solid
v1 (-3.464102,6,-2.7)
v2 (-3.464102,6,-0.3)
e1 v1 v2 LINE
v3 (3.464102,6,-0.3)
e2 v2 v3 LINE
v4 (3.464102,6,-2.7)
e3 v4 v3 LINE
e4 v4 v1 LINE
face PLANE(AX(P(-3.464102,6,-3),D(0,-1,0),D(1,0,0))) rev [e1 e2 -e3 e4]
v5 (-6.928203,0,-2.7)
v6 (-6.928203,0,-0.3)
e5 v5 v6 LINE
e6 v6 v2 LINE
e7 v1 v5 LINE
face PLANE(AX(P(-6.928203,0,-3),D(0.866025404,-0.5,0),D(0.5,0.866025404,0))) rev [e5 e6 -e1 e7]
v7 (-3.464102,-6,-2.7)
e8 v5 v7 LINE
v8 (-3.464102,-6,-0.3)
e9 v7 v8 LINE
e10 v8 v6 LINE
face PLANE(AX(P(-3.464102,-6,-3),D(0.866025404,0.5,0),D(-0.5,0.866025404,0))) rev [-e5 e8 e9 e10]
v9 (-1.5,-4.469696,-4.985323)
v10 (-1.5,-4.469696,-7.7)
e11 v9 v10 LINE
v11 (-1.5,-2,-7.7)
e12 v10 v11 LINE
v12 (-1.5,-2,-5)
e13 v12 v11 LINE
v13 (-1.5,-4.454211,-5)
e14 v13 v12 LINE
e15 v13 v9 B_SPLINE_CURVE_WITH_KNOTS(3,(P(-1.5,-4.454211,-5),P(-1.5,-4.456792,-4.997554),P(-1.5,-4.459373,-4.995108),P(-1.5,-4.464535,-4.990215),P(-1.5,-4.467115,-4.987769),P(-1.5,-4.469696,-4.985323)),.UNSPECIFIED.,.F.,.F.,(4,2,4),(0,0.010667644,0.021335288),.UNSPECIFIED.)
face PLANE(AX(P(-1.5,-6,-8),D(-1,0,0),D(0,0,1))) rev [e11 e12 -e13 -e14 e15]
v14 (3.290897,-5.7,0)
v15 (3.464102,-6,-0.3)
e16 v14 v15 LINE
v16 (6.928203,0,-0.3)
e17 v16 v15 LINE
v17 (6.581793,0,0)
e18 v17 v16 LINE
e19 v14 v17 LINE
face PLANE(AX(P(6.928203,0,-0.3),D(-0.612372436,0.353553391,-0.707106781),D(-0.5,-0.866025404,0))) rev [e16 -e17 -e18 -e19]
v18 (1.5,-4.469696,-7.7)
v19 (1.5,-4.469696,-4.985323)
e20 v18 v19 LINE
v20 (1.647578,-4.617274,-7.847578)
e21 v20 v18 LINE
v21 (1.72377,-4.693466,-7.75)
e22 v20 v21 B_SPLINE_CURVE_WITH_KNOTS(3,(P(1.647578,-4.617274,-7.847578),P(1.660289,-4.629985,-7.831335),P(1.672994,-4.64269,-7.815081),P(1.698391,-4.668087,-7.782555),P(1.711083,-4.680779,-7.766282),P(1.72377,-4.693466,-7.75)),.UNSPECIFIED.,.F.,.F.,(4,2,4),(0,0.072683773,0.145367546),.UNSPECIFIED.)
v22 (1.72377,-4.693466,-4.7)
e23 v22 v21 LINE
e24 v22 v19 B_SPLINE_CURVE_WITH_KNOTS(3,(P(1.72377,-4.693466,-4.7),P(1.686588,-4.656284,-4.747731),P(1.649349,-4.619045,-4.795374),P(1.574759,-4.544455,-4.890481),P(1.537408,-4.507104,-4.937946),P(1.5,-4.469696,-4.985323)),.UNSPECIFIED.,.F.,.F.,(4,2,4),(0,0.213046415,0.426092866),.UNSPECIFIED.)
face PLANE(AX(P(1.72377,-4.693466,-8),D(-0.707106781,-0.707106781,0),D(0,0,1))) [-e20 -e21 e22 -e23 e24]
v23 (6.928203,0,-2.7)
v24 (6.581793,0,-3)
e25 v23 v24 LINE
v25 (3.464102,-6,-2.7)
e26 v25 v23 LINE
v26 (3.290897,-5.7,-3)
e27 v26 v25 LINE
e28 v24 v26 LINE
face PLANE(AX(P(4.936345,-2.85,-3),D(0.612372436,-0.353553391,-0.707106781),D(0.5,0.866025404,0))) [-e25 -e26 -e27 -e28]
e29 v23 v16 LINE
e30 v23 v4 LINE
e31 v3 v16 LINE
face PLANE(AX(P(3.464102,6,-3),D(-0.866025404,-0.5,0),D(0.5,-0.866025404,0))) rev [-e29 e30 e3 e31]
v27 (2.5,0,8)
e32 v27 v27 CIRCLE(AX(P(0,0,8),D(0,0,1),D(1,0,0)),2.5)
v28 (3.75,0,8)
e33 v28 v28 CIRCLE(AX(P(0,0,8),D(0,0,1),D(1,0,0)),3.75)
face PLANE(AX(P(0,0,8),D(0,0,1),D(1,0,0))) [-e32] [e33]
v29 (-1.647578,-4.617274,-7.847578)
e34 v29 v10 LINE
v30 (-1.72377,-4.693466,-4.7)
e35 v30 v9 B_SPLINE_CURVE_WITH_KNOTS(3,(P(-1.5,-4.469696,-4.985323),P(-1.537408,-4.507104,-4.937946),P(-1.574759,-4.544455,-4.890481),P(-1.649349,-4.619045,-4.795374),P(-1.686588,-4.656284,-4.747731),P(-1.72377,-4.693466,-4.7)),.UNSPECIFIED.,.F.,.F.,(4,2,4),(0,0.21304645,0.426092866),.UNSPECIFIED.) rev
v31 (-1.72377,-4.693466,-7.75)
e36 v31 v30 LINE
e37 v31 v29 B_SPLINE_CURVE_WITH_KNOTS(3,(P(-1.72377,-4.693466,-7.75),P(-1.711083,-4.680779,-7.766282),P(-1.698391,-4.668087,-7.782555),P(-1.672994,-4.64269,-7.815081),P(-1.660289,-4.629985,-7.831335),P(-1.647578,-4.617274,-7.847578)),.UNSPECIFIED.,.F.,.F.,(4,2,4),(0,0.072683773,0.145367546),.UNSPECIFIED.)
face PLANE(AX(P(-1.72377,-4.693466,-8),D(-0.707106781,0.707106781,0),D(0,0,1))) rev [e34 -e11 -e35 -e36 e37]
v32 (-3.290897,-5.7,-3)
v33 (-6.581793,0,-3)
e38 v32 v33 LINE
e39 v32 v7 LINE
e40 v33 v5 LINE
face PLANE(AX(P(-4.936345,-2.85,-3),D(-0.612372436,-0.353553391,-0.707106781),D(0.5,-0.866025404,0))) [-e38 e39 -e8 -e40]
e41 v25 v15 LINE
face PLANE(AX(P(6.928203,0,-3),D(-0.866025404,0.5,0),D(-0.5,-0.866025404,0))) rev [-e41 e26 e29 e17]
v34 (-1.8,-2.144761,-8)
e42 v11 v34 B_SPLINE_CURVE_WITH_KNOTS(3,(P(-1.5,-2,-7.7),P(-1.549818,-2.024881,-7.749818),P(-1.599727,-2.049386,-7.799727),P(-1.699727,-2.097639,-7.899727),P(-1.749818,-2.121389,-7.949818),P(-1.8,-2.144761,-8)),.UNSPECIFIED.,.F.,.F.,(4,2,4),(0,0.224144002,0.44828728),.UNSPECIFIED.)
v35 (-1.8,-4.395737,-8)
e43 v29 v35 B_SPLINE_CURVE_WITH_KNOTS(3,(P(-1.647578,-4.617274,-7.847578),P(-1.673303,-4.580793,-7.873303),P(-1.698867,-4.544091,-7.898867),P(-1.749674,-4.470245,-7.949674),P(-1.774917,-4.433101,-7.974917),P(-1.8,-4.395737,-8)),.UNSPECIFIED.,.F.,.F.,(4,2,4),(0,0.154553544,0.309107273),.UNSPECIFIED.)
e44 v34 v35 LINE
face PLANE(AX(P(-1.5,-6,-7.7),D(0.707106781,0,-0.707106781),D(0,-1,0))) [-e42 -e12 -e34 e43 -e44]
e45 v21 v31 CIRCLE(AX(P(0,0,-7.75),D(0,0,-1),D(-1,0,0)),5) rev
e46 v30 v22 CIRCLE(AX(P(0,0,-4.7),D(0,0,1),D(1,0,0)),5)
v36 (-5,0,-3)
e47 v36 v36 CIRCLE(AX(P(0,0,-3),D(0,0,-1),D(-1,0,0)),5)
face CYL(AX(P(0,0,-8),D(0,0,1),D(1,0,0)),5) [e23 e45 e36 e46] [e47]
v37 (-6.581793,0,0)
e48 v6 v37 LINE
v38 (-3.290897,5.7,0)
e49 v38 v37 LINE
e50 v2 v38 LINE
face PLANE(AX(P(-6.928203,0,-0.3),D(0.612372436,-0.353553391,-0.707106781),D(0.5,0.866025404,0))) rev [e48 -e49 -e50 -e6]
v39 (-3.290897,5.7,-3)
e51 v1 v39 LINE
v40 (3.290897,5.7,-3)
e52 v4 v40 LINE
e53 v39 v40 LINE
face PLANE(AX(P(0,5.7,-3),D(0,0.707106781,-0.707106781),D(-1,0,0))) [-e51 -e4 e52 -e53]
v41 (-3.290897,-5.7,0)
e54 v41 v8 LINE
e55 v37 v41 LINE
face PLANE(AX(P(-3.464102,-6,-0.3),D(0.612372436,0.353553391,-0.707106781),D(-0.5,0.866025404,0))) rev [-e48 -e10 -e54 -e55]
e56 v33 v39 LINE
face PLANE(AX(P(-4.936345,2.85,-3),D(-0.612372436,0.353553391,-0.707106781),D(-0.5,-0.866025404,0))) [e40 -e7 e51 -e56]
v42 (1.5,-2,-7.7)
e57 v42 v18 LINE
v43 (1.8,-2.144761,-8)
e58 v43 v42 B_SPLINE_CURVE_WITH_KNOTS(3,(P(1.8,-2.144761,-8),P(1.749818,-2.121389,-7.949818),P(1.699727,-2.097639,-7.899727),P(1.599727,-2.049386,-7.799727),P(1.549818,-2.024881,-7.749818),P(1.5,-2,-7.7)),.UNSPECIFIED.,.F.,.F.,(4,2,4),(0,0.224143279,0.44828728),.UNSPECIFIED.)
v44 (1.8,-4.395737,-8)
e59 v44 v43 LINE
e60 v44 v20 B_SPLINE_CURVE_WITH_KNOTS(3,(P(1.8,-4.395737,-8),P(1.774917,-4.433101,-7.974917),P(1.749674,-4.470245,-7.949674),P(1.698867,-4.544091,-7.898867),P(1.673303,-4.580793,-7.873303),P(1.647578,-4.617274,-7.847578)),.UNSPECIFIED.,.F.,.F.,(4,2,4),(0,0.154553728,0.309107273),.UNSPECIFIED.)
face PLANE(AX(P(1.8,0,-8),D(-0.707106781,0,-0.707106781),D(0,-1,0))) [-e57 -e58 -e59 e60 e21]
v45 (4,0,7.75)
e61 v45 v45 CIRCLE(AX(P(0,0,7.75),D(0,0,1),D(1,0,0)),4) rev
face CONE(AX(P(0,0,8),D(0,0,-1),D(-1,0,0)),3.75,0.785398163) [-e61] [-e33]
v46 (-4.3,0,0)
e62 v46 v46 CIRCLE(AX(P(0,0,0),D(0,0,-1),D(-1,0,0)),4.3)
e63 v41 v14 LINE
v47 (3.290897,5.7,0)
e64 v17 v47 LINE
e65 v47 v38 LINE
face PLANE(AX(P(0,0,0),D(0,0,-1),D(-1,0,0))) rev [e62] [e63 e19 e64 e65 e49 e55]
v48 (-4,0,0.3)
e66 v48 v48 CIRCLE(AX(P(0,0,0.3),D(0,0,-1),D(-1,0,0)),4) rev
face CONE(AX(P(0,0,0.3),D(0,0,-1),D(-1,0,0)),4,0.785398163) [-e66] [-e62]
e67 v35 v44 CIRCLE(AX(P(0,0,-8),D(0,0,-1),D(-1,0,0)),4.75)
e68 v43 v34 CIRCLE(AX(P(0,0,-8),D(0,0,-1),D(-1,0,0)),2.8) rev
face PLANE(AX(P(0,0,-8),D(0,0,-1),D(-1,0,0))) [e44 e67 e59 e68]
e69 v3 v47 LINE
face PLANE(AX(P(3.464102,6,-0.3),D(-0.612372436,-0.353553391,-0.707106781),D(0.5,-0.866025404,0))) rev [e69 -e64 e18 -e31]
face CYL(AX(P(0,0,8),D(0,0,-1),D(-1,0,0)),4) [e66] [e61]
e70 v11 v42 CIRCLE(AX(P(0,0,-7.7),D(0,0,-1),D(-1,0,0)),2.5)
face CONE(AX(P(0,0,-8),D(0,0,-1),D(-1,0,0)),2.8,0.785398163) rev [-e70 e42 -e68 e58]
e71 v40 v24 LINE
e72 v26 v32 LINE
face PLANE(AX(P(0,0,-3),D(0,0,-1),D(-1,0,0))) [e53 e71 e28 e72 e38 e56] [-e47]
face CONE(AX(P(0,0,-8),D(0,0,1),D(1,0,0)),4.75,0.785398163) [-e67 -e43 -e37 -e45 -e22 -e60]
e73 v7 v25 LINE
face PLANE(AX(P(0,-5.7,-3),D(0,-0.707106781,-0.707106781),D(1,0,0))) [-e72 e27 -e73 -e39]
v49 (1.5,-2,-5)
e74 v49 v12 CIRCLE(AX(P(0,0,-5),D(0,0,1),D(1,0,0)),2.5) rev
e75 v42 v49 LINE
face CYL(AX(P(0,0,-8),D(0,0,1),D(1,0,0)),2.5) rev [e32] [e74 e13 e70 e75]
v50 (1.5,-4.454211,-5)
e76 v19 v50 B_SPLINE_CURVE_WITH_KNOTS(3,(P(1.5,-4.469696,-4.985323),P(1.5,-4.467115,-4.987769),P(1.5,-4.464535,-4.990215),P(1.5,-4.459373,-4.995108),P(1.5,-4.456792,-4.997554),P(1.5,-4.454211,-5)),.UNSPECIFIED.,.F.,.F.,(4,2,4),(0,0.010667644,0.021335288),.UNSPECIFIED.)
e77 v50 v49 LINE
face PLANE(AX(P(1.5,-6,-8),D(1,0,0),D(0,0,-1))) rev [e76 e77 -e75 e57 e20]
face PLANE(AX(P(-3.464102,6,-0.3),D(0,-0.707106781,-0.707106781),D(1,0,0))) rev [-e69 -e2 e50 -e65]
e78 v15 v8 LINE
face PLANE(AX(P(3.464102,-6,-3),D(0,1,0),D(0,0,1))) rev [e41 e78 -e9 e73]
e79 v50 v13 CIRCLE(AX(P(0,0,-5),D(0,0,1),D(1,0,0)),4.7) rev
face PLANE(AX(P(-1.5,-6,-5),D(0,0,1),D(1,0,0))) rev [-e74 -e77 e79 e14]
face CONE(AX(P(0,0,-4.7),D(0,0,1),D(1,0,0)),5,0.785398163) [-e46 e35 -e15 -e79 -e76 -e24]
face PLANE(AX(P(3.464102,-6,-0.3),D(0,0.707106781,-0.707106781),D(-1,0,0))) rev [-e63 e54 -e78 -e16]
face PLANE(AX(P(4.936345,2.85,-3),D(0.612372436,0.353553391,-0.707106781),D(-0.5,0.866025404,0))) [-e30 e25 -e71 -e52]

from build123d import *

# Parameters (mm, degrees)
SKETCH1_R           = 4
BOSS_EXTRUDE1_DEPTH = 8
BOSS_EXTRUDE2_DEPTH = 3
SKETCH3_R           = 5
BOSS_EXTRUDE3_DEPTH = 5
SKETCH4_R           = 2.5
CUT_EXTRUDE1_DEPTH  = 19.439088915
CHAMFER1_SIZE       = 0.3
CHAMFER2_SIZE       = 0.3
SKETCH5_W           = 3
SKETCH5_H           = 3
CUT_EXTRUDE2_DEPTH  = 13.165525061
CHAMFER3_SIZE       = 0.3
CHAMFER4_SIZE       = 0.3
CHAMFER5_SIZE       = 0.25


with BuildPart() as part:
    # Sketch1 → Boss-Extrude1 (new body)
    with BuildSketch(Plane.XY):
        Circle(SKETCH1_R)
    extrude(amount=BOSS_EXTRUDE1_DEPTH)

    # Sketch2 → Boss-Extrude2 (add)
    with BuildSketch(Plane(origin=(0, 0, 0), x_dir=(-1, 0, 0), z_dir=(0, 0, -1))):
        Polygon((-3.464101615, 6), (-6.92820323, 0), (-3.464101615, -6), (3.464101615, -6), (6.92820323, 0), (3.464101615, 6), align=None)
    extrude(amount=BOSS_EXTRUDE2_DEPTH)

    # Sketch3 → Boss-Extrude3 (add)
    with BuildSketch(Plane(origin=(0, 0, -3), x_dir=(-1, 0, 0), z_dir=(0, 0, -1))):
        Circle(SKETCH3_R)
    extrude(amount=BOSS_EXTRUDE3_DEPTH)

    # Sketch4 → Cut-Extrude1 (cut, through all)
    with BuildSketch(Plane.XY.offset(8)):
        Circle(SKETCH4_R)
    extrude(amount=-CUT_EXTRUDE1_DEPTH, mode=Mode.SUBTRACT)

    # Chamfer1
    chamfer1_edges = [part.edges().sort_by_distance(p)[0] for p in [
        (-4, 0, 0),
    ]]
    chamfer(chamfer1_edges, length=CHAMFER1_SIZE)

    # Chamfer2
    chamfer2_edges = [part.edges().sort_by_distance(p)[0] for p in [
        (-2.5, 0, -8),
    ]]
    chamfer(chamfer2_edges, length=CHAMFER2_SIZE)

    # Sketch5 → Cut-Extrude2 (cut, through all)
    with BuildSketch(Plane(origin=(0, 0, 0), x_dir=(1, 0, 0), z_dir=(0, 1, 0))):
        with Locations((0, 6.5)):
            Rectangle(SKETCH5_W, SKETCH5_H)
    extrude(amount=-CUT_EXTRUDE2_DEPTH, mode=Mode.SUBTRACT)

    # Chamfer3
    chamfer3_edges = [part.edges().sort_by_distance(p)[0] for p in [
        (-5.196152423, 3, -3),
        (0, 6, 0),
        (5.196152423, 3, 0),
        (5.196152423, -3, 0),
        (0, -6, 0),
        (-5.196152423, -3, 0),
        (-5.196152423, 3, 0),
        (0, 6, -3),
        (5.196152423, 3, -3),
        (5.196152423, -3, -3),
        (0, -6, -3),
        (-5.196152423, -3, -3),
    ]]
    chamfer(chamfer3_edges, length=CHAMFER3_SIZE)

    # Chamfer4
    # the kernel refuses this chamfer: 0.3, 0.239246049 mm, written as the material it takes off along each edge
    with BuildSketch(Plane(origin=(1.5, -1.592813187, -8), x_dir=(0, 0, 1), z_dir=(0, -1, 0))) as chamfer4_piece_1:
        Polygon((CHAMFER4_SIZE, 0), (0, -CHAMFER4_SIZE), (0, 0), align=None)
    extrude(amount=3.948387716, mode=Mode.SUBTRACT)
    with BuildSketch(Plane(origin=(-1.5, -1.592813187, -8), x_dir=(0, 0, 1), z_dir=(0, -1, 0))) as chamfer4_piece_2:
        Polygon((CHAMFER4_SIZE, 0), (0, CHAMFER4_SIZE), (0, 0), align=None)
    extrude(amount=3.948387716, mode=Mode.SUBTRACT)
    with BuildSketch(Plane(origin=(0, 0, -5), x_dir=(-0.44305448610570786, -0.8964946861758898, 0), z_dir=(-0.8964946861758898, 0.44305448610570786, 0))) as chamfer4_piece_3_section:
        Polygon((5, CHAMFER4_SIZE), (5 - CHAMFER4_SIZE, 0), (5, 0), align=None)
    chamfer4_piece_3 = revolve(axis=Axis((0, 0, -5), (0, 0, 1)), revolution_arc=52.597864763, mode=Mode.PRIVATE)
    chamfer4_piece_3 = split(chamfer4_piece_3, bisect_by=Plane(origin=(1.5, 0, -5), z_dir=(-1, 0, 0)), keep=Keep.TOP, mode=Mode.PRIVATE)
    chamfer4_piece_3 = split(chamfer4_piece_3, bisect_by=Plane(origin=(-1.5, 0, -5), z_dir=(1, 0, 0)), keep=Keep.TOP, mode=Mode.PRIVATE)
    add(chamfer4_piece_3, mode=Mode.SUBTRACT)
    with BuildSketch(Plane(origin=(-1.5, -4.769696007, -8.771504896), x_dir=(-0.946580683310887, 0.32246706805919617, 0), z_dir=(0, 0, 1))) as chamfer4_piece_4:
        with BuildLine():
            Line((0.236397724, 0), (CHAMFER4_SIZE * 0.322467068059, -CHAMFER4_SIZE * 0.946580683311))
            Line((CHAMFER4_SIZE * 0.322467068059, -CHAMFER4_SIZE * 0.946580683311), (0, 0))
            ThreePointArc((0, 0), (0.120844642, 0.001396592), (0.236397724, 0))
        make_face()
    extrude(amount=3.771504896, mode=Mode.SUBTRACT)
    with BuildSketch(Plane(origin=(1.5, -4.769696007, -8.771504896), x_dir=(0.9465806833108867, 0.32246706805919695, 0), z_dir=(0, 0, 1))) as chamfer4_piece_5:
        with BuildLine():
            Line((0.236397724, 0), (CHAMFER4_SIZE * 0.322467068059, CHAMFER4_SIZE * 0.946580683311))
            Line((CHAMFER4_SIZE * 0.322467068059, CHAMFER4_SIZE * 0.946580683311), (0, 0))
            ThreePointArc((0, 0), (0.120844642, -0.001396592), (0.236397724, 0))
        make_face()
    extrude(amount=3.771504896, mode=Mode.SUBTRACT)
    with BuildSketch(Plane(origin=(-1.5, -4.769696007, -8.771504896), x_dir=(-0.946580683310887, 0.32246706805919617, 0), z_dir=(0, 0, 1))) as chamfer4_piece_6a_section:
        with BuildLine():
            Line((0.236397724, 0), (CHAMFER4_SIZE * 0.322467068059, -CHAMFER4_SIZE * 0.946580683311))
            Line((CHAMFER4_SIZE * 0.322467068059, -CHAMFER4_SIZE * 0.946580683311), (0, 0))
            ThreePointArc((0, 0), (0.120844642, 0.001396592), (0.236397724, 0))
        make_face()
    chamfer4_piece_6a = extrude(amount=4.543009793, mode=Mode.PRIVATE)
    chamfer4_piece_6a = split(chamfer4_piece_6a, bisect_by=Plane(origin=(-1.5, -4.769696007, -5), z_dir=(0, 0, 1)), keep=Keep.TOP, mode=Mode.PRIVATE)
    with BuildSketch(Plane(origin=(0, 0, -5), x_dir=(-0.44305448610570786, -0.8964946861758898, 0), z_dir=(-0.8964946861758898, 0.44305448610570786, 0))) as chamfer4_piece_6b_section:
        Polygon((5, CHAMFER4_SIZE), (5 - CHAMFER4_SIZE, 0), (5, 0), align=None)
    chamfer4_piece_6b = revolve(axis=Axis((0, 0, -5), (0, 0, 1)), revolution_arc=52.597864763, mode=Mode.PRIVATE)
    chamfer4_piece_6b = split(chamfer4_piece_6b, bisect_by=Plane(origin=(-1.5, 0, -5), z_dir=(-1, 0, 0)), keep=Keep.TOP, mode=Mode.PRIVATE)
    chamfer4_piece_6 = chamfer4_piece_6a & chamfer4_piece_6b
    add(chamfer4_piece_6, mode=Mode.SUBTRACT)
    with BuildSketch(Plane(origin=(0, 0, -5), x_dir=(-0.44305448610570786, -0.8964946861758898, 0), z_dir=(-0.8964946861758898, 0.44305448610570786, 0))) as chamfer4_piece_7a_section:
        Polygon((5, CHAMFER4_SIZE), (5 - CHAMFER4_SIZE, 0), (5, 0), align=None)
    chamfer4_piece_7a = revolve(axis=Axis((0, 0, -5), (0, 0, 1)), revolution_arc=52.597864763, mode=Mode.PRIVATE)
    chamfer4_piece_7a = split(chamfer4_piece_7a, bisect_by=Plane(origin=(1.5, 0, -5), z_dir=(1, 0, 0)), keep=Keep.TOP, mode=Mode.PRIVATE)
    with BuildSketch(Plane(origin=(1.5, -4.769696007, -8.771504896), x_dir=(0.9465806833108867, 0.32246706805919695, 0), z_dir=(0, 0, 1))) as chamfer4_piece_7b_section:
        with BuildLine():
            Line((0.236397724, 0), (CHAMFER4_SIZE * 0.322467068059, CHAMFER4_SIZE * 0.946580683311))
            Line((CHAMFER4_SIZE * 0.322467068059, CHAMFER4_SIZE * 0.946580683311), (0, 0))
            ThreePointArc((0, 0), (0.120844642, -0.001396592), (0.236397724, 0))
        make_face()
    chamfer4_piece_7b = extrude(amount=4.543009793, mode=Mode.PRIVATE)
    chamfer4_piece_7b = split(chamfer4_piece_7b, bisect_by=Plane(origin=(1.5, -4.769696007, -5), z_dir=(0, 0, 1)), keep=Keep.TOP, mode=Mode.PRIVATE)
    chamfer4_piece_7 = chamfer4_piece_7a & chamfer4_piece_7b
    add(chamfer4_piece_7, mode=Mode.SUBTRACT)

    # Chamfer5
    chamfer5_edges = [part.edges().sort_by_distance(p)[0] for p in [
        (2.828427125, 4.123105626, -8),
        (-4, 0, 8),
    ]]
    chamfer(chamfer5_edges, length=CHAMFER5_SIZE)


solid = part.part
